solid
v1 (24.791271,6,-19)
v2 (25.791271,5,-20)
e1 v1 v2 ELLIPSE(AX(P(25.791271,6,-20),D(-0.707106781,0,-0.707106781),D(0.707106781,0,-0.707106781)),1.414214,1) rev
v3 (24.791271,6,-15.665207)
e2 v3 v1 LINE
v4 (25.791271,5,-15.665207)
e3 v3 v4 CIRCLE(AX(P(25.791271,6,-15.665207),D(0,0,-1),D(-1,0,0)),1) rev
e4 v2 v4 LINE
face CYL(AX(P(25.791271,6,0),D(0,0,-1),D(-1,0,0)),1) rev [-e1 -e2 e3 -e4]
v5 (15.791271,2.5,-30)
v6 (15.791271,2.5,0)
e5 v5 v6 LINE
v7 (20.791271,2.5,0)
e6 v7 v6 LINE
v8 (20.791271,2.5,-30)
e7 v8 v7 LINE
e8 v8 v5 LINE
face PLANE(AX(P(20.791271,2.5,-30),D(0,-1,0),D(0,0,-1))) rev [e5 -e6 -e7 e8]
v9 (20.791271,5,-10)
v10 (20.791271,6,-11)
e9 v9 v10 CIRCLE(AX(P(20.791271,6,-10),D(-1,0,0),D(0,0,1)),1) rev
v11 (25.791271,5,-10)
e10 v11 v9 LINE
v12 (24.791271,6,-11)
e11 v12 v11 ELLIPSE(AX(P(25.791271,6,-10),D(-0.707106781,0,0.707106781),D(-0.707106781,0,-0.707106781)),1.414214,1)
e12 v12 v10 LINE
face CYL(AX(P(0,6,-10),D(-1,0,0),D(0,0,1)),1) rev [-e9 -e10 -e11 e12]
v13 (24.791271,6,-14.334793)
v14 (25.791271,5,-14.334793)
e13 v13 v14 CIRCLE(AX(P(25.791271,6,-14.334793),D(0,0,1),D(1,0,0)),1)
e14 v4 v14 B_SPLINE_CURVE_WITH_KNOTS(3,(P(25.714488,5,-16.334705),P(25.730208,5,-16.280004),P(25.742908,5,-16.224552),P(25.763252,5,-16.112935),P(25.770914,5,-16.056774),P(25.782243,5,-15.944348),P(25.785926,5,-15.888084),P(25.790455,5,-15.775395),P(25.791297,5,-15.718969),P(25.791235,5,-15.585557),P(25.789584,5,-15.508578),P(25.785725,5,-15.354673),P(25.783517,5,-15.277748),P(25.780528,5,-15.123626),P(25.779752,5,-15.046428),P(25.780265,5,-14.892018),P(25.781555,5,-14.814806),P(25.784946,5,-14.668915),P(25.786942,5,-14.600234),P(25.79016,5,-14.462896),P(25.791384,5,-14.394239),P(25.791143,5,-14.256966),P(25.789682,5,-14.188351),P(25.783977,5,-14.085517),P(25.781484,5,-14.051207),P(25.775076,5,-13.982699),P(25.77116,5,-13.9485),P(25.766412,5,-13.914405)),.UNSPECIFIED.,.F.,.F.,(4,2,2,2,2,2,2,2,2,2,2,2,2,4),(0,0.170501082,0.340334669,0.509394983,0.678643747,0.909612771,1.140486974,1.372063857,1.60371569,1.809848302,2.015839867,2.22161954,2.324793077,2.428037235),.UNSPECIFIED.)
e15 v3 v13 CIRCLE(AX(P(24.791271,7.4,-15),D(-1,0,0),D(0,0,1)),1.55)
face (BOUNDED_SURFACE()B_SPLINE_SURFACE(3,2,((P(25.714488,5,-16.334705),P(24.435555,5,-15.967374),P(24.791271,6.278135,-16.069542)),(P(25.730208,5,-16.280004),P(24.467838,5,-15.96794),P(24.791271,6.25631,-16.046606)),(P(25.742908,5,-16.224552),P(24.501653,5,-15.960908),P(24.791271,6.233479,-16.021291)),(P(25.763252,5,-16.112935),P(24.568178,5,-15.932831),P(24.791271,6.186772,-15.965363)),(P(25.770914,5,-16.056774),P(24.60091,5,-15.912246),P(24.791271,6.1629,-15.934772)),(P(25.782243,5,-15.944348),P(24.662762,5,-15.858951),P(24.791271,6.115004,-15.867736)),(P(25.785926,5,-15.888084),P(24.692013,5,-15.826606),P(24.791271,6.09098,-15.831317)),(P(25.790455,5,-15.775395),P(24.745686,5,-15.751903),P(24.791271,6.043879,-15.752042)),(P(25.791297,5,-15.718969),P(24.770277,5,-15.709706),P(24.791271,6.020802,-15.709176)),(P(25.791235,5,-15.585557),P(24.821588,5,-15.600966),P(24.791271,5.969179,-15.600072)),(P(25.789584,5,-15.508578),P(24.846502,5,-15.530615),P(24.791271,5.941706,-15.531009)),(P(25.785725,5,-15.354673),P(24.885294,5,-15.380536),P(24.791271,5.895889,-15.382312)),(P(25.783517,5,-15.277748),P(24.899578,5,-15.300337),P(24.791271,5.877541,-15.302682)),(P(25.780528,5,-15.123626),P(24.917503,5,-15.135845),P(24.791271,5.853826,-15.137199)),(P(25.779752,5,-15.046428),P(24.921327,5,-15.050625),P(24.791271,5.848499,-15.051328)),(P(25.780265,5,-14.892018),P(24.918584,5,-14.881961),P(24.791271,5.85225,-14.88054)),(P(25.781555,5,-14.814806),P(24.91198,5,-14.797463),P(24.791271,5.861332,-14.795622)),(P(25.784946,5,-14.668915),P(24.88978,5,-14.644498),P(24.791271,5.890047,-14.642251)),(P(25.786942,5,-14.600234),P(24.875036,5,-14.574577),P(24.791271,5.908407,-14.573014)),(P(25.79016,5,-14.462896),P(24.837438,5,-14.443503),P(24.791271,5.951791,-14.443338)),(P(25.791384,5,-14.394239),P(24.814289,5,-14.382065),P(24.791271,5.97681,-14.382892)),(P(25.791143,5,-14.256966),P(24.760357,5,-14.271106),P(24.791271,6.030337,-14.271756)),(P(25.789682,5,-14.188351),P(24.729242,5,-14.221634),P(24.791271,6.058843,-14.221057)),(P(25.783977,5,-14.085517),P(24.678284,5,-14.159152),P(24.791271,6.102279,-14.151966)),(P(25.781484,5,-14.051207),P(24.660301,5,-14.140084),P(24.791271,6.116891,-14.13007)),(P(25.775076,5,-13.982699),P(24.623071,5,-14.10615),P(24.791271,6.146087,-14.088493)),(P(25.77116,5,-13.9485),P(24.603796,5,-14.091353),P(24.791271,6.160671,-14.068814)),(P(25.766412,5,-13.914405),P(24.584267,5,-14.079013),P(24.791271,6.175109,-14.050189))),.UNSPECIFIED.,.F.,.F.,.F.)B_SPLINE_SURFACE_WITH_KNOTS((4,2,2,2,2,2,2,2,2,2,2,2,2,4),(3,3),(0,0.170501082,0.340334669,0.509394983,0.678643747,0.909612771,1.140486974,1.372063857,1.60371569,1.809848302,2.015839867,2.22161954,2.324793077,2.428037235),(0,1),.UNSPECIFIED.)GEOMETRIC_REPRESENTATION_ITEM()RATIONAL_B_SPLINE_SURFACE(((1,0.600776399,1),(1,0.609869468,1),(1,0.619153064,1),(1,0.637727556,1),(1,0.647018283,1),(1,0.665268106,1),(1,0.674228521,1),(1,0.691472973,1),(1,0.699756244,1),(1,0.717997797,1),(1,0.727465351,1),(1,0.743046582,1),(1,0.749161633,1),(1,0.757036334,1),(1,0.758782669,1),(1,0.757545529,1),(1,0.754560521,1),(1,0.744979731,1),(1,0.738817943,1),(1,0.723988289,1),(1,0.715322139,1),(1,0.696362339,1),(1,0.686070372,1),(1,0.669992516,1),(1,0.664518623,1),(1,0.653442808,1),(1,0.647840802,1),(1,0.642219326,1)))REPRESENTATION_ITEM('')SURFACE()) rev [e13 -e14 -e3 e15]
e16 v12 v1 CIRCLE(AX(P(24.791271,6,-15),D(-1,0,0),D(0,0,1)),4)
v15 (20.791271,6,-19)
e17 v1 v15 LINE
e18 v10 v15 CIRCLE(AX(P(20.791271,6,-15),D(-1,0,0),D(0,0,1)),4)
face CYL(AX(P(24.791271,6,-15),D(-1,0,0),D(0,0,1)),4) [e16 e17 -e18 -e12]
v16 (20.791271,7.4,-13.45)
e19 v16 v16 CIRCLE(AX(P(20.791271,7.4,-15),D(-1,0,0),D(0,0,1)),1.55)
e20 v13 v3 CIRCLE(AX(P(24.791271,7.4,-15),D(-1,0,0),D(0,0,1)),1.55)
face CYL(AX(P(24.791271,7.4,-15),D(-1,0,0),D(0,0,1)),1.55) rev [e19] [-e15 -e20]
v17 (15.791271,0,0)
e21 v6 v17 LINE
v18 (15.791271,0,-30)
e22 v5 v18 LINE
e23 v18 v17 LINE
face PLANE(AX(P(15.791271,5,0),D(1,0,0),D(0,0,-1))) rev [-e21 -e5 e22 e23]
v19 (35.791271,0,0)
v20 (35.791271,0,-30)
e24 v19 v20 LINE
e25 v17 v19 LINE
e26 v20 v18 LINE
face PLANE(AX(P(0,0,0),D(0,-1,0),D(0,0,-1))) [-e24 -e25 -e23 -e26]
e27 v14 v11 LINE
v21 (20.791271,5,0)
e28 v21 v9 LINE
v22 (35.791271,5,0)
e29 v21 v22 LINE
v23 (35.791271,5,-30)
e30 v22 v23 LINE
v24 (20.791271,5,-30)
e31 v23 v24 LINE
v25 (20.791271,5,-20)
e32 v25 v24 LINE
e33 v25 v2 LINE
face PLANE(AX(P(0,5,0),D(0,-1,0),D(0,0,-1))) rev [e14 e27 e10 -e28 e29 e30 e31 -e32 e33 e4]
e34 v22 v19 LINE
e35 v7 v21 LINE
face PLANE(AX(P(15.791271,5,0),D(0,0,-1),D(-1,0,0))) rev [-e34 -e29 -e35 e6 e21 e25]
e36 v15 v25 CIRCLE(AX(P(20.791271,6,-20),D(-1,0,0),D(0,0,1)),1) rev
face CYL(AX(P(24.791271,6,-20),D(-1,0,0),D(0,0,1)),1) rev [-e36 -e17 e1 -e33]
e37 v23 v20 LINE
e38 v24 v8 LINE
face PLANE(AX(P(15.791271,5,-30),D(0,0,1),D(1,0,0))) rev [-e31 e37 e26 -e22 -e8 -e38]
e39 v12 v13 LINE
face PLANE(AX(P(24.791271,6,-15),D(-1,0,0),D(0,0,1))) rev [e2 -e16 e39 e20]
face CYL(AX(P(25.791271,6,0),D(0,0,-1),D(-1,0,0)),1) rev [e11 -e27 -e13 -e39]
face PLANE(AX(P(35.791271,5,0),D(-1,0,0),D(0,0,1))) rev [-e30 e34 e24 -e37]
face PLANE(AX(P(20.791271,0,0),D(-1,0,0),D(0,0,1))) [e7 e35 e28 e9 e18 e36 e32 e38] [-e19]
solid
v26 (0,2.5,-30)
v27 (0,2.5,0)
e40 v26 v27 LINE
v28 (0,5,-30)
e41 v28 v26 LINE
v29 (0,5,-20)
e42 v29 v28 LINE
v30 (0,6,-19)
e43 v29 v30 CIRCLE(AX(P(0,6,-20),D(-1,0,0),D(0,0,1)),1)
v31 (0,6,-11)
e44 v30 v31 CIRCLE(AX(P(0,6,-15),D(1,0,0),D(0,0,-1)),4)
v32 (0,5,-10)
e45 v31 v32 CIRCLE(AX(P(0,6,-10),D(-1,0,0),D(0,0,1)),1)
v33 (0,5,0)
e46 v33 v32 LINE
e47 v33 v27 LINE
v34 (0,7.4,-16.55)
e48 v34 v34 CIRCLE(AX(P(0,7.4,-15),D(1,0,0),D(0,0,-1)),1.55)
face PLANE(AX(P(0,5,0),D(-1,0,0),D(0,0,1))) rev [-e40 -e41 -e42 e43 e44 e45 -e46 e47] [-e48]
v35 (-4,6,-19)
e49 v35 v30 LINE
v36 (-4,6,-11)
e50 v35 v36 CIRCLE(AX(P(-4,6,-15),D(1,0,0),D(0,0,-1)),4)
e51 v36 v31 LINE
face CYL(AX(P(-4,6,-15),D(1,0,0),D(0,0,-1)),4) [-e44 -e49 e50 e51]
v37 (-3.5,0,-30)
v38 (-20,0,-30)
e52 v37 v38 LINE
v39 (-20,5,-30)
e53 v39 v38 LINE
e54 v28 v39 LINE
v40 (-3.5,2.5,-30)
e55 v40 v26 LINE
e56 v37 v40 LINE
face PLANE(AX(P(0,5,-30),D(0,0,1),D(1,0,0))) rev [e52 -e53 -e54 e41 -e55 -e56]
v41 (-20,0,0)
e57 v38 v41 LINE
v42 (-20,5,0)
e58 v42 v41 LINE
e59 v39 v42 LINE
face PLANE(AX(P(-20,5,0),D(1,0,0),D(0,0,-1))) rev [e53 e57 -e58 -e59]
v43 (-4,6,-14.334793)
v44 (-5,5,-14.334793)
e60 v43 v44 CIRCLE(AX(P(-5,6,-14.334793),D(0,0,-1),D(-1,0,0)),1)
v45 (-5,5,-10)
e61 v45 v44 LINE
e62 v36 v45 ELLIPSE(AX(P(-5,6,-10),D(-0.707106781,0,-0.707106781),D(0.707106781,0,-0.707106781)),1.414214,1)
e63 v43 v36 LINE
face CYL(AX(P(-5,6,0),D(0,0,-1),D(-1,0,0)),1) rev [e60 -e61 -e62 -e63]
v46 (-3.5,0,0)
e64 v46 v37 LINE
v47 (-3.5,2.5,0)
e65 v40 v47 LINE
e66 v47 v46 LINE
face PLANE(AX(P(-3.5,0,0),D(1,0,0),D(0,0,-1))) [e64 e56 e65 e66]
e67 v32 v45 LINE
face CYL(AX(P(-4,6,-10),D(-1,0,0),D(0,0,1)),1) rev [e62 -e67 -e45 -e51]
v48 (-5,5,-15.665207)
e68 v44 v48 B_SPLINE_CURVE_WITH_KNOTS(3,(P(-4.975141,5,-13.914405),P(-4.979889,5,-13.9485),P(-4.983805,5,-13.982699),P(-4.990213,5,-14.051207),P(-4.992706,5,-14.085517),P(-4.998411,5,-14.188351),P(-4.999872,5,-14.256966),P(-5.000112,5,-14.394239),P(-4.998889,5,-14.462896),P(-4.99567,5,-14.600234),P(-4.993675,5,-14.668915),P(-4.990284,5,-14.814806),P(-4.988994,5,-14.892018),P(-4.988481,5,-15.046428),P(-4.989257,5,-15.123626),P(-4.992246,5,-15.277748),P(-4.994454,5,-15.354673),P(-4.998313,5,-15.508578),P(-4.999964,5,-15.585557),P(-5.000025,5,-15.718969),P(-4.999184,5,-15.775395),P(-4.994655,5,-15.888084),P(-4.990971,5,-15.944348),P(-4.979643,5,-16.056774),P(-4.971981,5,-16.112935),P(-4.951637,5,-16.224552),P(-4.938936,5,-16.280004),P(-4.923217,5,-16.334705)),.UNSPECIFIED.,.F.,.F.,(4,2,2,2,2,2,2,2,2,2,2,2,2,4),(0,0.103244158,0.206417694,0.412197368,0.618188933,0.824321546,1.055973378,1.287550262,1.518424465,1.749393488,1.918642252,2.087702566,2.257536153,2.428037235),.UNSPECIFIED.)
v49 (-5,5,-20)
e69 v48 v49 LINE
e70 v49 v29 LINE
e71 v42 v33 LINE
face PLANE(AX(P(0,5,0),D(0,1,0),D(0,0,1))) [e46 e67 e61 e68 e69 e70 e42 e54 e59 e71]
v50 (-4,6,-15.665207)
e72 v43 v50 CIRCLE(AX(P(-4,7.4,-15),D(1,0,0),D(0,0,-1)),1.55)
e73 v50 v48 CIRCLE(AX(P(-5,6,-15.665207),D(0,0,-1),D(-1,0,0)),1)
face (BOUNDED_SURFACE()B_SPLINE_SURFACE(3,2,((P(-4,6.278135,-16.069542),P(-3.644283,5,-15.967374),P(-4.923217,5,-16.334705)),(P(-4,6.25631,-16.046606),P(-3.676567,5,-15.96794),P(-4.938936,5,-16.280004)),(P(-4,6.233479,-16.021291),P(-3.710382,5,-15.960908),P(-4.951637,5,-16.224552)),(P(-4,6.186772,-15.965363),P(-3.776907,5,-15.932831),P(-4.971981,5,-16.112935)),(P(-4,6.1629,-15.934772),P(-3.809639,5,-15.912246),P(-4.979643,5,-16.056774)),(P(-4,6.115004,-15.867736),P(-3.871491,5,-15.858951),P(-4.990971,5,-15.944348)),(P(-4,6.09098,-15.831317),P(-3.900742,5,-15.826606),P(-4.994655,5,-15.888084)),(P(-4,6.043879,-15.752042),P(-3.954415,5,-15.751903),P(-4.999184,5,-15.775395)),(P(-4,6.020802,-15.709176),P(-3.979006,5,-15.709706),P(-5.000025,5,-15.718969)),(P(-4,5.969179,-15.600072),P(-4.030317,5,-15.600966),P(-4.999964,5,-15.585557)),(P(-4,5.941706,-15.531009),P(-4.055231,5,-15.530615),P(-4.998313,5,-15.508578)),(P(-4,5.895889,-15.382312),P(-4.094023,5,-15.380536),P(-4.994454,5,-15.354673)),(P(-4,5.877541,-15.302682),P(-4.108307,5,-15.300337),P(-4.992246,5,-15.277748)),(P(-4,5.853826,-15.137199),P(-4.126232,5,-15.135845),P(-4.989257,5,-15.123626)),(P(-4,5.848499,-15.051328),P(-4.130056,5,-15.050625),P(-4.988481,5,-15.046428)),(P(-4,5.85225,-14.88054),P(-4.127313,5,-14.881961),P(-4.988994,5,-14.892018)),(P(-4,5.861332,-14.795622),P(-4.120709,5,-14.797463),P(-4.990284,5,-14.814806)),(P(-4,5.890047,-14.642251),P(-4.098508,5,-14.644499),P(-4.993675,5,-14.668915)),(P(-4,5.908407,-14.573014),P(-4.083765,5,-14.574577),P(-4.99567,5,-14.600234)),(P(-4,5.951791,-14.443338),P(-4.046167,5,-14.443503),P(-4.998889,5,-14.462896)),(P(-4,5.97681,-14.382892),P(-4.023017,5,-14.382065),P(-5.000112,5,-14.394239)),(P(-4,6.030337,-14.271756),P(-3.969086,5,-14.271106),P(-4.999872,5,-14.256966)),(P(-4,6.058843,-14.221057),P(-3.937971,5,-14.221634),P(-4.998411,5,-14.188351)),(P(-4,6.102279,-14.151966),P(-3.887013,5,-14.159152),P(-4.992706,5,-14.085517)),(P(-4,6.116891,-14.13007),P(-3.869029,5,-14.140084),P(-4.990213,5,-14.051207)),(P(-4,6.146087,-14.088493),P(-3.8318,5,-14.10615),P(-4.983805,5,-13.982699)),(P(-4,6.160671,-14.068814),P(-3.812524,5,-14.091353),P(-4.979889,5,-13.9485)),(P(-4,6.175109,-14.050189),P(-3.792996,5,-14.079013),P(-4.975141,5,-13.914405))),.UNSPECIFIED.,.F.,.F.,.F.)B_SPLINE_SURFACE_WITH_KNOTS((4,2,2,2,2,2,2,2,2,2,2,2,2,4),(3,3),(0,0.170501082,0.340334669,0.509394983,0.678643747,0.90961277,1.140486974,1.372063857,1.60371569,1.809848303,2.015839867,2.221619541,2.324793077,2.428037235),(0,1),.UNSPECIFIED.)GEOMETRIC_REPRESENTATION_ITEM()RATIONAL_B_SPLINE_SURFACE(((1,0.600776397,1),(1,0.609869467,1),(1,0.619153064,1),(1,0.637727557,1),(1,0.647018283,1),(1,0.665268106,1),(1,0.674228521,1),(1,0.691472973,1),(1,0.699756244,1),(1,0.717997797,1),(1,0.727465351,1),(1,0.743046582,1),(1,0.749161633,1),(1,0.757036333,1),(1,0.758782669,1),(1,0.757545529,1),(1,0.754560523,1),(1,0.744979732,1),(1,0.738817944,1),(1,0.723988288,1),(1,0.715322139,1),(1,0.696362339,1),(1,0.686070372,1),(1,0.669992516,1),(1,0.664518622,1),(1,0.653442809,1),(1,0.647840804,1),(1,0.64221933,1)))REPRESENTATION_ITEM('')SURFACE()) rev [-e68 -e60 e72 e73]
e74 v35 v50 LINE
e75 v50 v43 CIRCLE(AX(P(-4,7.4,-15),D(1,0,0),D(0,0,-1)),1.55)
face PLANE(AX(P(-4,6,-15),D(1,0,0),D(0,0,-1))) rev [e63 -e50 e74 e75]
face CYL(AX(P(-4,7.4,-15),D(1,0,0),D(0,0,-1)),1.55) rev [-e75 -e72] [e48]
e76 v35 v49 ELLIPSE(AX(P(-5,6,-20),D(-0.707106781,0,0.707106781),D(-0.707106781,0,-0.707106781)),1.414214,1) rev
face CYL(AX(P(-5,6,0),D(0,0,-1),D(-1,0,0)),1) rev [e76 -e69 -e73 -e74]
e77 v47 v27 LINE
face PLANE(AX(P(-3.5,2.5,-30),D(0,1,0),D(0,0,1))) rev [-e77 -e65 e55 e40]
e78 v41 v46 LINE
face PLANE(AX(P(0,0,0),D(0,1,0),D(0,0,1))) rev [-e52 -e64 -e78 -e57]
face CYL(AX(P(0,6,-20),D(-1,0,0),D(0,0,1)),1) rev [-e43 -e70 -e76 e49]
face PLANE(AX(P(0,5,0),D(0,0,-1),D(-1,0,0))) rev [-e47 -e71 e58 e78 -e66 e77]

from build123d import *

# Parameters (mm, degrees)
SKETCH1_W             = 20
SKETCH1_H             = 30
BOSS_EXTRUDE1_DEPTH   = 5
BOSS_EXTRUDE1_2_DEPTH = 5
SKETCH2_W             = 30
SKETCH2_H             = 2.5
CUT_EXTRUDE1_DEPTH    = 3.5
SKETCH3_W             = 30
SKETCH3_H             = 2.5
CUT_EXTRUDE2_DEPTH    = 5
SKETCH4_R             = 1.55
BOSS_EXTRUDE2_DEPTH   = 4
FILLET1_R             = 1
SKETCH5_R             = 1.55
BOSS_EXTRUDE3_DEPTH   = 4
FILLET2_R             = 1


with BuildPart() as part:
    # Sketch1 → Boss-Extrude1 (new body)
    with BuildSketch(Plane(origin=(0, 0, 0), x_dir=(1, 0, 0), z_dir=(0, 1, 0))):
        with Locations((-10, 15)):
            Rectangle(SKETCH1_W, SKETCH1_H)
    extrude(amount=BOSS_EXTRUDE1_DEPTH)

    # Sketch2 → Cut-Extrude1 (cut)
    with BuildSketch(Plane(origin=(0, 0, 0), x_dir=(0, 0, -1), z_dir=(1, 0, 0))):
        with Locations((15, 1.25)):
            Rectangle(SKETCH2_W, SKETCH2_H)
    extrude(amount=-CUT_EXTRUDE1_DEPTH, mode=Mode.SUBTRACT)

    # Sketch5 → Boss-Extrude3 (add)
    with BuildSketch(Plane(origin=(0, 0, 0), x_dir=(0, 0, -1), z_dir=(1, 0, 0))):
        with BuildLine():
            Line((11, 5), (19, 5))
            Line((19, 5), (19, 6))
            ThreePointArc((19, 6), (15, 10), (11, 6))
            Line((11, 6), (11, 5))
        make_face()
        with Locations(Location((15, 7.4, 0), (0, 0, 180))):
            Circle(SKETCH5_R, mode=Mode.SUBTRACT)
    extrude(amount=-BOSS_EXTRUDE3_DEPTH)

    # Fillet2
    fillet2_edges = [part.edges().sort_by_distance(p)[0] for p in [
        (-2, 5, -11),
        (-4, 5, -15),
        (-2, 5, -19),
    ]]
    fillet(fillet2_edges, radius=FILLET2_R - 0.0001)  # a hair under: the kernel refuses the full size


with BuildPart() as body_2:
    # Sketch1 → Boss-Extrude1 2 (new body)
    with BuildSketch(Plane(origin=(0, 0, 0), x_dir=(1, 0, 0), z_dir=(0, 1, 0))):
        with Locations((25.791271198, 15)):
            Rectangle(SKETCH1_W, SKETCH1_H)
    extrude(amount=BOSS_EXTRUDE1_2_DEPTH)

    # Sketch3 → Cut-Extrude2 (cut)
    with BuildSketch(Plane.ZY.offset(-15.791271198)):
        with Locations((-15, 3.75)):
            Rectangle(SKETCH3_W, SKETCH3_H)
    extrude(amount=-CUT_EXTRUDE2_DEPTH, mode=Mode.SUBTRACT)

    # Sketch4 → Boss-Extrude2 (add)
    with BuildSketch(Plane.ZY.offset(-20.791271198)):
        with BuildLine():
            Line((-19, 5), (-11, 5))
            Line((-11, 5), (-11, 6))
            ThreePointArc((-11, 6), (-15, 10), (-19, 6))
            Line((-19, 6), (-19, 5))
        make_face()
        with Locations((-15, 7.4)):
            Circle(SKETCH4_R, mode=Mode.SUBTRACT)
    extrude(amount=-BOSS_EXTRUDE2_DEPTH)

    # Fillet1
    fillet1_edges = [body_2.edges().sort_by_distance(p)[0] for p in [
        (22.791271198, 5, -19),
        (24.791271198, 5, -15),
        (22.791271198, 5, -11),
    ]]
    fillet(fillet1_edges, radius=FILLET1_R - 0.0001)  # a hair under: the kernel refuses the full size


solid = Compound([part.part, body_2.part])
